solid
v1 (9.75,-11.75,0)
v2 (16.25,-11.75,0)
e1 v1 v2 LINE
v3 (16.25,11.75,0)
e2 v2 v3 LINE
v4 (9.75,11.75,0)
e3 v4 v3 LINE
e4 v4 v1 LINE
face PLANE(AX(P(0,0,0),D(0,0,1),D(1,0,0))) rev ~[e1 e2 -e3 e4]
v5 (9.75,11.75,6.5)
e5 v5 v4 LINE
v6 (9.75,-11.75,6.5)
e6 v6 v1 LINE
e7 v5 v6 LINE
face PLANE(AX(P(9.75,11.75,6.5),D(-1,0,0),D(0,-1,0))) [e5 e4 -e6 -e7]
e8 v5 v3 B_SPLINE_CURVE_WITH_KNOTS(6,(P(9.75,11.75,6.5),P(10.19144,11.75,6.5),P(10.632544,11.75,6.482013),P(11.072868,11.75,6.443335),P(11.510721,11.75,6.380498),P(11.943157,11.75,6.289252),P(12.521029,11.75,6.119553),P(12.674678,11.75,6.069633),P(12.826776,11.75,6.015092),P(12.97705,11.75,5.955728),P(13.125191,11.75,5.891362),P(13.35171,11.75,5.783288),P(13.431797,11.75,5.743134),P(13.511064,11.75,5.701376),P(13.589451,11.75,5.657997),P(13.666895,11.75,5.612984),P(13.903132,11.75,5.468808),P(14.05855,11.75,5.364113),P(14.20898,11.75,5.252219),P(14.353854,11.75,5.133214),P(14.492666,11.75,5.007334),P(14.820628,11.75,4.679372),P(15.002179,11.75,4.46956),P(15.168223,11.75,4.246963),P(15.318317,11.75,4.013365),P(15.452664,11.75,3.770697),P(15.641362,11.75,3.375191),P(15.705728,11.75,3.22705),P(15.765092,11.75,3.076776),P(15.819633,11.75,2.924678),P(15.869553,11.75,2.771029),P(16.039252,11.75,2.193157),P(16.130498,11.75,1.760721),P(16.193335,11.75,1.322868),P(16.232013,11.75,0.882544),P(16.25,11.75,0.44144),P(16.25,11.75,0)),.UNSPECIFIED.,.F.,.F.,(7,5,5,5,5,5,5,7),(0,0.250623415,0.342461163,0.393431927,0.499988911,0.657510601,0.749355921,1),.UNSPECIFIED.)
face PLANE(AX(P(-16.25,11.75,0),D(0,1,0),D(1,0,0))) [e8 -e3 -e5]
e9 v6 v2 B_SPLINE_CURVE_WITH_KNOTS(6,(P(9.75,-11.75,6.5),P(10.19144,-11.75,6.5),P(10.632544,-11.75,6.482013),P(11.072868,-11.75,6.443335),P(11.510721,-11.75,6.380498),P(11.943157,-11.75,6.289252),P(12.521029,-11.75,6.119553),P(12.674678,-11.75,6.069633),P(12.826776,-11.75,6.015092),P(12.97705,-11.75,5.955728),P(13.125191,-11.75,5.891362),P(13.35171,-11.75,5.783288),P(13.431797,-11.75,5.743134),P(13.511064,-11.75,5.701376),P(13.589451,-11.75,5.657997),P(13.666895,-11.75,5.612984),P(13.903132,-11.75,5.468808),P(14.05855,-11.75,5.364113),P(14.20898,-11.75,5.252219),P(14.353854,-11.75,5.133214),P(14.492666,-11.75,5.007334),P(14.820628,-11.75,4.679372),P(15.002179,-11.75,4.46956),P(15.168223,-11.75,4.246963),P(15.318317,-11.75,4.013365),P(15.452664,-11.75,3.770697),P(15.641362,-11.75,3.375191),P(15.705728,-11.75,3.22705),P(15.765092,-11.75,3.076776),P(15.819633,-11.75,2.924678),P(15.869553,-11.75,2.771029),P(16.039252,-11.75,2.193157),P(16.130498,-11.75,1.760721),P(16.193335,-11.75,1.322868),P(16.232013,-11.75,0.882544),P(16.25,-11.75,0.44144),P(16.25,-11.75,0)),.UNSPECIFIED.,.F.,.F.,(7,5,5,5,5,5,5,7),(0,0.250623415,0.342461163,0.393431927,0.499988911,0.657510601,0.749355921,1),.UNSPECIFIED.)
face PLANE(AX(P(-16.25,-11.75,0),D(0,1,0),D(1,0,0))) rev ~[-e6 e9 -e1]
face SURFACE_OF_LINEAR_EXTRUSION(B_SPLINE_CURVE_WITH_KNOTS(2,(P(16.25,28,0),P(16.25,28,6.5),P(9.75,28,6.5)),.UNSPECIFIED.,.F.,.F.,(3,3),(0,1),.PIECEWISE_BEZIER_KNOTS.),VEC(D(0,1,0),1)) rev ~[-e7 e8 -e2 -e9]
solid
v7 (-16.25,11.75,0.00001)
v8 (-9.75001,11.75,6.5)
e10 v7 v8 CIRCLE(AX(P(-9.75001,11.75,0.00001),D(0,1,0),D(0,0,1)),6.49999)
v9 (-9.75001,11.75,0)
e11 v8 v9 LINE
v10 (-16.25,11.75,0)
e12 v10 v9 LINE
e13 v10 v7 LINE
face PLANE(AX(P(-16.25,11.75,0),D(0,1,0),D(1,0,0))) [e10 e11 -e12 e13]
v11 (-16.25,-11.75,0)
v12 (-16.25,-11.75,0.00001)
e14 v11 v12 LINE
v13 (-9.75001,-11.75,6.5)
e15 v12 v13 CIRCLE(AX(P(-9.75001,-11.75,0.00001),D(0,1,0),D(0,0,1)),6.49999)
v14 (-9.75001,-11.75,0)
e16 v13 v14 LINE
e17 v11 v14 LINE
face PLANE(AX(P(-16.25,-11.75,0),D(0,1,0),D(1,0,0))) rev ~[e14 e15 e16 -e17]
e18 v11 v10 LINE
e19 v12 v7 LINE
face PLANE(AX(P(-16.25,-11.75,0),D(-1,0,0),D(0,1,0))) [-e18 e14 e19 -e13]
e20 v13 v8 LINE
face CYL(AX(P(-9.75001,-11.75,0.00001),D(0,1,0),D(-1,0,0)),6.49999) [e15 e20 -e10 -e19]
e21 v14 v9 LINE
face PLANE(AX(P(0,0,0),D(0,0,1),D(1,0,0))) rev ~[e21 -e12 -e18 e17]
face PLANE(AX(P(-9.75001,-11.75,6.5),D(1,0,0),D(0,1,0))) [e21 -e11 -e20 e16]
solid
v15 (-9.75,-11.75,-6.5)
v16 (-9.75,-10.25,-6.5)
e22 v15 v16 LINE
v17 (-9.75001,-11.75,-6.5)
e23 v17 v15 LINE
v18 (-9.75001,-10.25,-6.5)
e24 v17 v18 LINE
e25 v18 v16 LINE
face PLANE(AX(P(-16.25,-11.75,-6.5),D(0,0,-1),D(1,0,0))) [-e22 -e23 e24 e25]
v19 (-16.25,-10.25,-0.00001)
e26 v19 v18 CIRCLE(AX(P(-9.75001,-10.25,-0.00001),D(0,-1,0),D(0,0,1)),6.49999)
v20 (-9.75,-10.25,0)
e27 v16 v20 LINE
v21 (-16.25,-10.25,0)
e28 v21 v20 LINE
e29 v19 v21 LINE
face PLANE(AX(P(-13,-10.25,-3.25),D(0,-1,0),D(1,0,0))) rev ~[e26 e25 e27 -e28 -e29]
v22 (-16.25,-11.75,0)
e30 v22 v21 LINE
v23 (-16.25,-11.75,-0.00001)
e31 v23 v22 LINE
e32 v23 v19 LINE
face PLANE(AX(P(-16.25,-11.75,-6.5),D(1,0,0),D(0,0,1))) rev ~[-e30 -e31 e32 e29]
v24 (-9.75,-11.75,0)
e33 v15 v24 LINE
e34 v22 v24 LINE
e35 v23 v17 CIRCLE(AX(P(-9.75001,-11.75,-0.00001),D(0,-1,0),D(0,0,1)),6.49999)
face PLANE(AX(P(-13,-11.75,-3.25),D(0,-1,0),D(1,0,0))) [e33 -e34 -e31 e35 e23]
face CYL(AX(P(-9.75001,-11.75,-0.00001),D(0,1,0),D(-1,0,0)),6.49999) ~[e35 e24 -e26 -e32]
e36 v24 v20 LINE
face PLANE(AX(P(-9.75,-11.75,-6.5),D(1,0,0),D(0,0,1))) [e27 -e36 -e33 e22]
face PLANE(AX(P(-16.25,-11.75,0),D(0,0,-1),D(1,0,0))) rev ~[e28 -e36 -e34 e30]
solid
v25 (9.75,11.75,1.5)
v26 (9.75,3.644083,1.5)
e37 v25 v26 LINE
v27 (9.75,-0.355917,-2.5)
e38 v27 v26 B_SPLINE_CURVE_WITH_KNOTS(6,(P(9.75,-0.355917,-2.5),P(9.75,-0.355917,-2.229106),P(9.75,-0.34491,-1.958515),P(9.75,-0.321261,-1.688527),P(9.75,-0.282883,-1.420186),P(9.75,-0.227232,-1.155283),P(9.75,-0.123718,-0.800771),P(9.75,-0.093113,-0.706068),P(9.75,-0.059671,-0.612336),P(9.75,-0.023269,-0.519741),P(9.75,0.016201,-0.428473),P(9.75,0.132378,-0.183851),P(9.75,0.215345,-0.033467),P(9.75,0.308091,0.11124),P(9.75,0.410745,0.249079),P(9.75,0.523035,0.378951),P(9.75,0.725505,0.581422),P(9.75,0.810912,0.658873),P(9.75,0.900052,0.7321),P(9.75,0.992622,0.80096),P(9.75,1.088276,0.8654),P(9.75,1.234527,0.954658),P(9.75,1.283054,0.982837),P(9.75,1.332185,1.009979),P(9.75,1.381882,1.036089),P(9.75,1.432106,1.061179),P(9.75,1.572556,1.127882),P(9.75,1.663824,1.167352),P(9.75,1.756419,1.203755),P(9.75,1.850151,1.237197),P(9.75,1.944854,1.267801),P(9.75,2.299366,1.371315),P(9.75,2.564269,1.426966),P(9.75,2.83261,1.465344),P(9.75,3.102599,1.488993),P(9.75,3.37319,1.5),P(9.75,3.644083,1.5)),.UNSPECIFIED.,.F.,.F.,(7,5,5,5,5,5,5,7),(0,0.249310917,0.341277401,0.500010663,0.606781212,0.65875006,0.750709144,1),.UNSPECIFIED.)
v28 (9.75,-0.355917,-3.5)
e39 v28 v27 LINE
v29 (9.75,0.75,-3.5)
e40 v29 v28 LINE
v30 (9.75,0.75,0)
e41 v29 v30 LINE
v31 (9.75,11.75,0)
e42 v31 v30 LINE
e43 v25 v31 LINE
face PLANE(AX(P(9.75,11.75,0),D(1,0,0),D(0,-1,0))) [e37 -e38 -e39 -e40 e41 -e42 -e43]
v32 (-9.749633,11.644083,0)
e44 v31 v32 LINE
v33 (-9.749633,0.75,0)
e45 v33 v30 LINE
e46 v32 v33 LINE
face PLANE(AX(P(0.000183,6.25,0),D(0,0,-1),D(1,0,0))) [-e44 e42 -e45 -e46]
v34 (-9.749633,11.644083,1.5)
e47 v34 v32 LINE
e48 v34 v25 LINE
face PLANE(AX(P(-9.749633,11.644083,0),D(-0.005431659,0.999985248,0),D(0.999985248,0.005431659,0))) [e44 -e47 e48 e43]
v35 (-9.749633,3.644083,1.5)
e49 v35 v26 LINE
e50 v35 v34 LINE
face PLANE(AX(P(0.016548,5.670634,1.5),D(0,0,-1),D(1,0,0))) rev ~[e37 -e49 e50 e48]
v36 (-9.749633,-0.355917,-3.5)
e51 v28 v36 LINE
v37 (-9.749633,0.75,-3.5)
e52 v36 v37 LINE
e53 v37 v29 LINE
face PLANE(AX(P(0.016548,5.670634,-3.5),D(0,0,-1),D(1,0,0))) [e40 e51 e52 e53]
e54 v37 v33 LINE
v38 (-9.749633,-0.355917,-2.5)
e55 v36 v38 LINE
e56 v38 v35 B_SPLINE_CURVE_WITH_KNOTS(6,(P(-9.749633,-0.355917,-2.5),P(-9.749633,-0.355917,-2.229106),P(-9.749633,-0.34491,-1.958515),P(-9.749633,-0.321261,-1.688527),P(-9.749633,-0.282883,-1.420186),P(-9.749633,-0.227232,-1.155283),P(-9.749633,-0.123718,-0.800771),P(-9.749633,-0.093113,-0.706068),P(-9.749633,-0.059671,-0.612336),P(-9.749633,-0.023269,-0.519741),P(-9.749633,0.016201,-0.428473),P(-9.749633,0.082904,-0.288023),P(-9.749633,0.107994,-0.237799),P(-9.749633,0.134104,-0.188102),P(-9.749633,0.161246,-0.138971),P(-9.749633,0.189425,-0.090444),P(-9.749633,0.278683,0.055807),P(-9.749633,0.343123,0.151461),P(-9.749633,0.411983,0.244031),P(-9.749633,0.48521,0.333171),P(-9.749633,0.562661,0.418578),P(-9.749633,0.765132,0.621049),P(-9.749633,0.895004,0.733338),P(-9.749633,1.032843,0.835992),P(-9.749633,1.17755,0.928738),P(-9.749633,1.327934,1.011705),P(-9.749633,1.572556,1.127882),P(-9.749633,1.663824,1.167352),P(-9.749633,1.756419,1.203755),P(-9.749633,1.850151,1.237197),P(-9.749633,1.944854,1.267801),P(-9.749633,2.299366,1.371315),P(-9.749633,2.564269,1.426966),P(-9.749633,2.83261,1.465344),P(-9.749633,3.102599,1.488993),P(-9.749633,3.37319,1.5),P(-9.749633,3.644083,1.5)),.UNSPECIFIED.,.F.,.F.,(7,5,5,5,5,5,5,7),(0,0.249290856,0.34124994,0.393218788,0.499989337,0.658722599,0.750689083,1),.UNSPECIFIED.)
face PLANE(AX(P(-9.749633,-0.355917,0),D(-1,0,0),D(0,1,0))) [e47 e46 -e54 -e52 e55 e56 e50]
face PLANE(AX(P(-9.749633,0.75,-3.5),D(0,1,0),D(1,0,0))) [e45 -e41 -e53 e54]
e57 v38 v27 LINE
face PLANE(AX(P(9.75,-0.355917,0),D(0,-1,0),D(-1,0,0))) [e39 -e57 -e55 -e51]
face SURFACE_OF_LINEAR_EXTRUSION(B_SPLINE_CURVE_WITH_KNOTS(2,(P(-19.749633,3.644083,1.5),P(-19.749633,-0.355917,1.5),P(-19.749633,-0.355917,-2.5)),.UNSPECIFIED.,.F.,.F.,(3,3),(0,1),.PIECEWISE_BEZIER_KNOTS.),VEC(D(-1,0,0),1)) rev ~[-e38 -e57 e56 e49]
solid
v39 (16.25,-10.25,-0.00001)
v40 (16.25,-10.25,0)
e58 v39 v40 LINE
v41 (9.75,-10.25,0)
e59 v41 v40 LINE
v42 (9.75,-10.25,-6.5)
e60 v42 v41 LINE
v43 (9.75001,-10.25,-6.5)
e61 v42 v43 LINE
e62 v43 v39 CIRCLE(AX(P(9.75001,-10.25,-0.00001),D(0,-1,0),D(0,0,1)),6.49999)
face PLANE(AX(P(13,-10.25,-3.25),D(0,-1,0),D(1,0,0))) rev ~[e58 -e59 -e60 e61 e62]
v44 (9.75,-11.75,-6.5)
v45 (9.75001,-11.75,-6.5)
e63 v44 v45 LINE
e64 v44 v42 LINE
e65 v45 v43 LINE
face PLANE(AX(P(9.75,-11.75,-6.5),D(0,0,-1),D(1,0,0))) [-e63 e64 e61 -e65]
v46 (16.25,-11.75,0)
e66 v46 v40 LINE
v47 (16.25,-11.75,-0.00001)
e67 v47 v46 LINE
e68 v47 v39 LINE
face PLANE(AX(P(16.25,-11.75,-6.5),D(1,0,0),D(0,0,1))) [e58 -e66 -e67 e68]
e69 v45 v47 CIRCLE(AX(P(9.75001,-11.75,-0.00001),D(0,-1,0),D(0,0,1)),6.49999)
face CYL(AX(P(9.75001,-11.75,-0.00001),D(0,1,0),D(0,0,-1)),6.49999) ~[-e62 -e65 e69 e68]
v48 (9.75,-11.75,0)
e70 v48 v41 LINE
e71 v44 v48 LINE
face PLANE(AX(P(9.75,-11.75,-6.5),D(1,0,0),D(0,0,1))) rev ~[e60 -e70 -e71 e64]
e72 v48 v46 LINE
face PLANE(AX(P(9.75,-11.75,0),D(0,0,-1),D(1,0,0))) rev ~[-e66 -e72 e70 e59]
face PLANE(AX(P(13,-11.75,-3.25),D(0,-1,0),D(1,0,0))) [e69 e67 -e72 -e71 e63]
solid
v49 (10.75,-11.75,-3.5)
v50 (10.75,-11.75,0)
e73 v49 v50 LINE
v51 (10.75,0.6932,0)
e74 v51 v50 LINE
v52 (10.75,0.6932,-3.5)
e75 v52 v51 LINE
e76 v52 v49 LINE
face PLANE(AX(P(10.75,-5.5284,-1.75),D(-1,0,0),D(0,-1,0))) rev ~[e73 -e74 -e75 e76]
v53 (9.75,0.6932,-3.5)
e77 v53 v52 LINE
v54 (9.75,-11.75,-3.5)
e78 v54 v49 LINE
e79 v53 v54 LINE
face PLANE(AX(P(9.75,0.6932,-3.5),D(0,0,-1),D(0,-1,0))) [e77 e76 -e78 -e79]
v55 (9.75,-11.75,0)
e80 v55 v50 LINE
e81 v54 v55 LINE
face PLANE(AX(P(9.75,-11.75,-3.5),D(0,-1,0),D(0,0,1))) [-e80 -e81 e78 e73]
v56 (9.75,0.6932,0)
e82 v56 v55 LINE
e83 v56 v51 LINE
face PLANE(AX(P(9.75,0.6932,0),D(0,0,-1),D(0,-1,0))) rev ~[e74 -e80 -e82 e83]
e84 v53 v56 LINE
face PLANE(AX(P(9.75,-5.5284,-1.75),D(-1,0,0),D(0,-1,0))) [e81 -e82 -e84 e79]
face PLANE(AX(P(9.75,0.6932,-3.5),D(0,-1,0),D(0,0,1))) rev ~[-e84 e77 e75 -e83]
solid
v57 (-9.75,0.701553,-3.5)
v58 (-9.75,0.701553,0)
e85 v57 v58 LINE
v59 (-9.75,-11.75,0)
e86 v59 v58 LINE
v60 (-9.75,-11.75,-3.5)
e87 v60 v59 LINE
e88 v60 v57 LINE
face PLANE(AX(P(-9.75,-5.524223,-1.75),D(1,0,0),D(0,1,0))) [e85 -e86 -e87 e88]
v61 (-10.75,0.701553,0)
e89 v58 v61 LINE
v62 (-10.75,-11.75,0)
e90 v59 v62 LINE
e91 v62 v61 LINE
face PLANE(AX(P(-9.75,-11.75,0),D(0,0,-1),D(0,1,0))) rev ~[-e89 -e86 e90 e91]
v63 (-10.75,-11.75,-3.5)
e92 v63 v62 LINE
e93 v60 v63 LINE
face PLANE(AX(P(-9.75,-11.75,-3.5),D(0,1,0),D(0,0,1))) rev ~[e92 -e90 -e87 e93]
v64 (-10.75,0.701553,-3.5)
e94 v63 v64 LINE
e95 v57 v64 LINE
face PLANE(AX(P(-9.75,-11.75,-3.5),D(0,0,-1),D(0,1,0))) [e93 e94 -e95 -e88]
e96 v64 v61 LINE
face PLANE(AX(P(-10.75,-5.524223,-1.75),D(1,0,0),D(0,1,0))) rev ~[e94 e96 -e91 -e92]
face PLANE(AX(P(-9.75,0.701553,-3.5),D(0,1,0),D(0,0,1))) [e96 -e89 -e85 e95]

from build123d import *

# Parameters (mm, degrees)
F0_W         = 32.5
F0_H         = 23.5
F1_DEPTH     = 6.5
F2_T1_DEPTH  = 56
F3_R         = 6.49999
F4_DEPTH     = 6.5
F6_DEPTH     = 3.5
F7_W         = 6.5
F7_H         = 6.5
F8_DEPTH     = 1.5
F9_R         = 6.49999
F10_W        = 6.5
F10_H        = 6.5
F11_DEPTH    = 1.5
F12_R        = 6.49999
F13_DEPTH    = 1.5
F14_T1_DEPTH = 39.4996332601
F15_W        = 19.4996332601
F15_H        = 11
F16_DEPTH    = 3.5
F17_W        = 12.4515531301
F17_H        = 3.5
F18_DEPTH    = 1
F19_W        = 12.4432003307
F19_H        = 3.5
F20_DEPTH    = 1


# Not quite as in the source:
# - a fillet or chamfer that OpenCascade refuses, or shapes differently, is made with other operations: its cross-section is extruded or revolved along the edge and cut away or added
# - a fillet or chamfer is up to 0.001 mm smaller than in the source, because OpenCascade refuses the exact size


with BuildPart() as f1:
    # F0 (on Top) → F1 (new body)
    with BuildSketch(Plane.XY):
        Rectangle(F0_W, F0_H)
    extrude(amount=F1_DEPTH)

    # F2: fillet of radius 6.5 on 1 edges, made by hand

    # F2_s2 → F2_t1 (cut)
    with BuildSketch(Plane.XZ.offset(-28)):
        with BuildLine():
            add(Edge.make_bspline(
                [(16.25, 0), (16.25, 6.5), (9.75, 6.5)],
                knots=[0, 0, 0, 1, 1, 1], degree=2, weights=[1, 1, 1]))
            Line((9.75, 6.5), (16.25, 6.5))
            Line((16.25, 6.5), (16.25, 0))
        make_face()
    extrude(amount=F2_T1_DEPTH, mode=Mode.SUBTRACT)

    # F3 (radius 6.5 in the source; OpenCascade refuses exactly that, so slightly less here)
    f3_edges = [f1.edges().sort_by_distance(p)[0] for p in [
        (-16.25, 0, 6.5),
    ]]
    fillet(f3_edges, radius=F3_R)

    # F4 (cut): a face of the model
    f4_faces = [f1.faces().sort_by_distance(p)[0] for p in [
        (-5e-06, 0, 6.5),
    ]]
    extrude(f4_faces, amount=-F4_DEPTH, mode=Mode.SUBTRACT)


with BuildPart() as f6:
    # F5 (on face) → F6 (new body)
    with BuildSketch(Plane(origin=(0, 0, 0), x_dir=(1, 0, 0), z_dir=(0, 0, -1))):
        Polygon((-9.7496332601, 0.3559169248), (-9.7496332601, -11.6440830752), (9.75, -11.75), (9.75, 0.3559169248), align=None)
    extrude(amount=F6_DEPTH)

    # F5 (on face) → F13 (join)
    with BuildSketch(Plane(origin=(0, 0, 0), x_dir=(1, 0, 0), z_dir=(0, 0, -1))):
        Polygon((-9.7496332601, 0.3559169248), (-9.7496332601, -11.6440830752), (9.75, -11.75), (9.75, 0.3559169248), align=None)
    extrude(amount=-F13_DEPTH)

    # F14: fillet of radius 4 on 1 edges, made by hand

    # F14_s2 → F14_t1 (cut)
    with BuildSketch(Plane.YZ.offset(-19.7496332601)):
        with BuildLine():
            add(Edge.make_bspline(
                [(3.6440830752, 1.5), (-0.3559169248, 1.5), (-0.3559169248, -2.5)],
                knots=[0, 0, 0, 1, 1, 1], degree=2, weights=[1, 1, 1]))
            Line((-0.3559169248, -2.5), (-0.3559169248, 1.5))
            Line((-0.3559169248, 1.5), (3.6440830752, 1.5))
        make_face()
    extrude(amount=F14_T1_DEPTH, mode=Mode.SUBTRACT)

    # F15 (on face) → F16 (cut)
    with BuildSketch(Plane(origin=(0, 0, -3.5), x_dir=(1, 0, 0), z_dir=(0, 0, -1))):
        with Locations((0.00018337, -6.25)):
            Rectangle(F15_W, F15_H)
    extrude(amount=-F16_DEPTH, mode=Mode.SUBTRACT)


with BuildPart() as f8:
    # F7 (on face) → F8 (new body)
    with BuildSketch(Plane.XZ.offset(11.75)):
        with Locations((-13, -3.25)):
            Rectangle(F7_W, F7_H)
    extrude(amount=-F8_DEPTH)

    # F9 (radius 6.5 in the source; OpenCascade refuses exactly that, so slightly less here)
    f9_edges = [f8.edges().sort_by_distance(p)[0] for p in [
        (-16.25, -11, -6.5),
    ]]
    fillet(f9_edges, radius=F9_R)


with BuildPart() as f11:
    # F10 (on face) → F11 (new body)
    with BuildSketch(Plane.XZ.offset(11.75)):
        with Locations((13, -3.25)):
            Rectangle(F10_W, F10_H)
    extrude(amount=-F11_DEPTH)

    # F12 (radius 6.5 in the source; OpenCascade refuses exactly that, so slightly less here)
    f12_edges = [f11.edges().sort_by_distance(p)[0] for p in [
        (16.25, -11, -6.5),
    ]]
    fillet(f12_edges, radius=F12_R)


with BuildPart() as f18:
    # F17 (on face) → F18 (new body)
    with BuildSketch(Plane.YZ.offset(-9.75)):
        with Locations((-5.524223435, -1.75)):
            Rectangle(F17_W, F17_H)
    extrude(amount=-F18_DEPTH)


with BuildPart() as f20:
    # F19 (on face) → F20 (new body)
    with BuildSketch(Plane(origin=(9.75, 0, 0), x_dir=(0, -1, 0), z_dir=(-1, 0, 0))):
        with Locations((5.5283998346, -1.75)):
            Rectangle(F19_W, F19_H)
    extrude(amount=-F20_DEPTH)


solid = Compound([f1.part, f6.part, f8.part, f11.part, f18.part, f20.part])
